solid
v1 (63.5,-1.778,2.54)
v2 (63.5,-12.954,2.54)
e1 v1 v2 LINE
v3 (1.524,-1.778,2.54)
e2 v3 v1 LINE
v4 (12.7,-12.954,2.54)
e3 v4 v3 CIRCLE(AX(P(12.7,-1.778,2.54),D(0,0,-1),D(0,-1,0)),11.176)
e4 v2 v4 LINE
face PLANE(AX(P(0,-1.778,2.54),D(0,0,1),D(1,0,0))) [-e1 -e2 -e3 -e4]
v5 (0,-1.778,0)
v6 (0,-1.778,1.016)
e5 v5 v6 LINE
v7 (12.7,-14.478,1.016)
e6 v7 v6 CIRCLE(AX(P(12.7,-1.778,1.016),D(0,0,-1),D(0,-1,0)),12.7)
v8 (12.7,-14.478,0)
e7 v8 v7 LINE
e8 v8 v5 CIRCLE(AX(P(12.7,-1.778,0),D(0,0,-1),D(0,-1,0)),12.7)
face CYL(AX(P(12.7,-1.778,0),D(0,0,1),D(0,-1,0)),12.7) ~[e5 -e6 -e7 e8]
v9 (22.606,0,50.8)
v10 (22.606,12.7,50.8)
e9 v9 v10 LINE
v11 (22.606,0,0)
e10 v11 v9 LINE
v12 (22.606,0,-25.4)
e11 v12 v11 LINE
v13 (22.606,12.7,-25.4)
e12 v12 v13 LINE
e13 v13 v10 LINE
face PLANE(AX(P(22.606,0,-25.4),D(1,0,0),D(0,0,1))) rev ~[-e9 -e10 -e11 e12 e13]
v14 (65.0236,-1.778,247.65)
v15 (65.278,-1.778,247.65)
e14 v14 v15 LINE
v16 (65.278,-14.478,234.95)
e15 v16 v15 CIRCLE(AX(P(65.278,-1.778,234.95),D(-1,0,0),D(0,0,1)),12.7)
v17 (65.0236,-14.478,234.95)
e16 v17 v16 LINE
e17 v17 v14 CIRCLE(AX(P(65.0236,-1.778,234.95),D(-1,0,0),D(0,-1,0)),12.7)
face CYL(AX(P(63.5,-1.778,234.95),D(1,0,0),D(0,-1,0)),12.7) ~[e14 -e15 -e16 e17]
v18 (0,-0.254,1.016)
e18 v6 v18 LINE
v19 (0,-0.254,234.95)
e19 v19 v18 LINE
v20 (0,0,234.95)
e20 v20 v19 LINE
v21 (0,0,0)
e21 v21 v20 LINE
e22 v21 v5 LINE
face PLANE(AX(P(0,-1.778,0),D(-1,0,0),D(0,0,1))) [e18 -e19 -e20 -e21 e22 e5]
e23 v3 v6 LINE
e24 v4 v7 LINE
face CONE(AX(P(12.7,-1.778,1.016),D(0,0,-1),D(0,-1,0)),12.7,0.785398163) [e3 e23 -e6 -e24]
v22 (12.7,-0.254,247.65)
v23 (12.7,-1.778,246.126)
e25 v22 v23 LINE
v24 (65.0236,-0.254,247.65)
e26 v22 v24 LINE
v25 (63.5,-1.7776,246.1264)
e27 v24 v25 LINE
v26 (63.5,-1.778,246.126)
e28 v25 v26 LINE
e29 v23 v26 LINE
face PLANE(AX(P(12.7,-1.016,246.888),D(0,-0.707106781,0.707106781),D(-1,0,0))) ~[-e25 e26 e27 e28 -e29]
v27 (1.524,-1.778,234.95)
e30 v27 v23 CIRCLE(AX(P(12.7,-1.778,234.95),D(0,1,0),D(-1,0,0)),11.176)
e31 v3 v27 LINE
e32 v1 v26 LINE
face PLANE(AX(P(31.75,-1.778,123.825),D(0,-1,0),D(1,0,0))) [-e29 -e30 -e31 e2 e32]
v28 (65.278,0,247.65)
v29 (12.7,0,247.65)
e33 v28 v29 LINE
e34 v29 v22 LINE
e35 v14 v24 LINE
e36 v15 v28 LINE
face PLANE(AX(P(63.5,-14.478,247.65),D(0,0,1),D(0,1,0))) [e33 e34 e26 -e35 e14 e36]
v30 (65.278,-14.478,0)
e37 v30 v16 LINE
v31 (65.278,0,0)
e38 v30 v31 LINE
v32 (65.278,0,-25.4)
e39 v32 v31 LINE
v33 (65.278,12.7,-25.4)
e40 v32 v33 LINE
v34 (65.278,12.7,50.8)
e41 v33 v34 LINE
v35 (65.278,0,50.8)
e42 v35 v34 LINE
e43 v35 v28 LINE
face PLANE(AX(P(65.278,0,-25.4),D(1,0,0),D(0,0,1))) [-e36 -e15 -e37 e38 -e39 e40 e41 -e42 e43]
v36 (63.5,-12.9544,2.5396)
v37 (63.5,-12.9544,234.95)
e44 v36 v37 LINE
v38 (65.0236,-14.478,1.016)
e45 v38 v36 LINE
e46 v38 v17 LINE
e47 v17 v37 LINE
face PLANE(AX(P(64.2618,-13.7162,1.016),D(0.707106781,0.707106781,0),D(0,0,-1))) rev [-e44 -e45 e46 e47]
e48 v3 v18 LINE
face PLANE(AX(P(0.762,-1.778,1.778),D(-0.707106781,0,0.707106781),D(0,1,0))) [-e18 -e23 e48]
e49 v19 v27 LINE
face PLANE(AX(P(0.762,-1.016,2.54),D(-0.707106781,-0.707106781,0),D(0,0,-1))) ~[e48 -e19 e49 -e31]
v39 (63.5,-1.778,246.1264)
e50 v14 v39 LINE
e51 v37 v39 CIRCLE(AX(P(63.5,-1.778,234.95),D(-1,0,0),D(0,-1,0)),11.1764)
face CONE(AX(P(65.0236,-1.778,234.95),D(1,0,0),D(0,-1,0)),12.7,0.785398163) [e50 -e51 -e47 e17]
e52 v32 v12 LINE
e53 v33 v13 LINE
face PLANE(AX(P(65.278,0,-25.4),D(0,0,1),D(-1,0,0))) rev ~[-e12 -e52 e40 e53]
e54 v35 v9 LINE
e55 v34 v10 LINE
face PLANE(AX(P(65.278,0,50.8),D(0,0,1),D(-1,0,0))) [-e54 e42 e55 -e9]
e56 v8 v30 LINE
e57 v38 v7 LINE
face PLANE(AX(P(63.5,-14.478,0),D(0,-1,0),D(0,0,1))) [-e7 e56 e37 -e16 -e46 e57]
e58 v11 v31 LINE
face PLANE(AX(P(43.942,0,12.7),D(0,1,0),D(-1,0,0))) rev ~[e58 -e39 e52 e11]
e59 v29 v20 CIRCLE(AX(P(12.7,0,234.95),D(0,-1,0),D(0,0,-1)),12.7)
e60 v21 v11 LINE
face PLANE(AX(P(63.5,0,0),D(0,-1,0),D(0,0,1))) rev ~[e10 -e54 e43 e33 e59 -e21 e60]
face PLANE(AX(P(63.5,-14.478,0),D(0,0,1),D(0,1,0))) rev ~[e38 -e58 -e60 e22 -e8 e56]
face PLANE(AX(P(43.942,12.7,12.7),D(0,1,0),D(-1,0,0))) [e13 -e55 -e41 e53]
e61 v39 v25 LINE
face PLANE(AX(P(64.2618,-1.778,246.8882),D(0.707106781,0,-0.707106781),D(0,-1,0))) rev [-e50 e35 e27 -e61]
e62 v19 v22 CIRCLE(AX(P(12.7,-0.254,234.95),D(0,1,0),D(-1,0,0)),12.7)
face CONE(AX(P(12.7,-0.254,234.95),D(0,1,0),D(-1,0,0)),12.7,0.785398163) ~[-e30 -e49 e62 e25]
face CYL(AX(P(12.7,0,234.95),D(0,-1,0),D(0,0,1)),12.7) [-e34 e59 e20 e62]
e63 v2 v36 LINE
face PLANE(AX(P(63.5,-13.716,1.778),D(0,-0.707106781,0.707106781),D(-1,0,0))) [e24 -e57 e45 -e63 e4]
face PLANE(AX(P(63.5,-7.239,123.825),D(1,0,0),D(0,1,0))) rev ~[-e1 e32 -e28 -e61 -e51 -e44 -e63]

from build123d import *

# Parameters (mm, degrees)
F0_W        = 63.5
F0_H        = 247.65
F1_DEPTH    = 1.778
F2_W        = 63.5
F2_H        = 2.54
F3_DEPTH    = 12.7
F4_W        = 14.478
F4_H        = 247.65
F5_DEPTH    = 1.778
F6_W        = 42.672
F6_H        = 76.2
F7_DEPTH    = 12.7
F8_R        = 12.7
F9_R        = 12.7
F10_C1_SIZE = 1.524
F10_C2_SIZE = 1.524
F10_C3_SIZE = 1.5236


# Not quite as in the source:
# - a fillet or chamfer is up to 0.001 mm smaller than in the source, because OpenCascade refuses the exact size


with BuildPart() as f1:
    # F0 (on Front) → F1 (new body)
    with BuildSketch(Plane.XZ):
        with Locations((31.75, 123.825)):
            Rectangle(F0_W, F0_H)
    extrude(amount=F1_DEPTH)

    # F2 (on face) → F3 (join)
    with BuildSketch(Plane.XZ.offset(1.778)):
        with Locations((31.75, 1.27)):
            Rectangle(F2_W, F2_H)
    extrude(amount=F3_DEPTH)

    # F4 (on face) → F5 (join)
    with BuildSketch(Plane.YZ.offset(63.5)):
        with Locations((-7.239, 123.825)):
            Rectangle(F4_W, F4_H)
    extrude(amount=F5_DEPTH)

    # F6 (on face) → F7 (join)
    with BuildSketch(Plane(origin=(0, 0, 0), x_dir=(-1, 0, 0), z_dir=(0, 1, 0))):
        with Locations((-43.942, 12.7)):
            Rectangle(F6_W, F6_H)
    extrude(amount=F7_DEPTH)

    # F8
    f8_edges = [f1.edges().sort_by_distance(p)[0] for p in [
        (0, -0.889, 247.65),
        (64.389, -14.478, 247.65),
    ]]
    fillet(f8_edges, radius=F8_R)

    # F9
    f9_edges = [f1.edges().sort_by_distance(p)[0] for p in [
        (0, -14.478, 1.27),
    ]]
    fillet(f9_edges, radius=F9_R)

    # F10: chamfer of 1.524 on 3 edges, made by hand

    # F10_c1
    f10_c1_edges = [f1.edges().sort_by_distance(p)[0] for p in [
        (0, -1.778, 118.745),
        (3.7197438789, -1.778, 243.9302561211),
        (38.1, -1.778, 247.65),
    ]]
    chamfer(f10_c1_edges, length=F10_C1_SIZE)

    # F10_c2
    f10_c2_edges = [f1.edges().sort_by_distance(p)[0] for p in [
        (3.7197438789, -10.7582561211, 2.54),
        (38.1, -14.478, 2.54),
    ]]
    chamfer(f10_c2_edges, length=F10_C2_SIZE)

    # F10_c3 (size 1.524 in the source; OpenCascade refuses exactly that, so slightly less here)
    f10_c3_edges = [f1.edges().sort_by_distance(p)[0] for p in [
        (63.5, -14.478, 118.745),
        (63.5, -10.7582561211, 243.9302561211),
    ]]
    chamfer(f10_c3_edges, length=F10_C3_SIZE)


solid = f1.part
